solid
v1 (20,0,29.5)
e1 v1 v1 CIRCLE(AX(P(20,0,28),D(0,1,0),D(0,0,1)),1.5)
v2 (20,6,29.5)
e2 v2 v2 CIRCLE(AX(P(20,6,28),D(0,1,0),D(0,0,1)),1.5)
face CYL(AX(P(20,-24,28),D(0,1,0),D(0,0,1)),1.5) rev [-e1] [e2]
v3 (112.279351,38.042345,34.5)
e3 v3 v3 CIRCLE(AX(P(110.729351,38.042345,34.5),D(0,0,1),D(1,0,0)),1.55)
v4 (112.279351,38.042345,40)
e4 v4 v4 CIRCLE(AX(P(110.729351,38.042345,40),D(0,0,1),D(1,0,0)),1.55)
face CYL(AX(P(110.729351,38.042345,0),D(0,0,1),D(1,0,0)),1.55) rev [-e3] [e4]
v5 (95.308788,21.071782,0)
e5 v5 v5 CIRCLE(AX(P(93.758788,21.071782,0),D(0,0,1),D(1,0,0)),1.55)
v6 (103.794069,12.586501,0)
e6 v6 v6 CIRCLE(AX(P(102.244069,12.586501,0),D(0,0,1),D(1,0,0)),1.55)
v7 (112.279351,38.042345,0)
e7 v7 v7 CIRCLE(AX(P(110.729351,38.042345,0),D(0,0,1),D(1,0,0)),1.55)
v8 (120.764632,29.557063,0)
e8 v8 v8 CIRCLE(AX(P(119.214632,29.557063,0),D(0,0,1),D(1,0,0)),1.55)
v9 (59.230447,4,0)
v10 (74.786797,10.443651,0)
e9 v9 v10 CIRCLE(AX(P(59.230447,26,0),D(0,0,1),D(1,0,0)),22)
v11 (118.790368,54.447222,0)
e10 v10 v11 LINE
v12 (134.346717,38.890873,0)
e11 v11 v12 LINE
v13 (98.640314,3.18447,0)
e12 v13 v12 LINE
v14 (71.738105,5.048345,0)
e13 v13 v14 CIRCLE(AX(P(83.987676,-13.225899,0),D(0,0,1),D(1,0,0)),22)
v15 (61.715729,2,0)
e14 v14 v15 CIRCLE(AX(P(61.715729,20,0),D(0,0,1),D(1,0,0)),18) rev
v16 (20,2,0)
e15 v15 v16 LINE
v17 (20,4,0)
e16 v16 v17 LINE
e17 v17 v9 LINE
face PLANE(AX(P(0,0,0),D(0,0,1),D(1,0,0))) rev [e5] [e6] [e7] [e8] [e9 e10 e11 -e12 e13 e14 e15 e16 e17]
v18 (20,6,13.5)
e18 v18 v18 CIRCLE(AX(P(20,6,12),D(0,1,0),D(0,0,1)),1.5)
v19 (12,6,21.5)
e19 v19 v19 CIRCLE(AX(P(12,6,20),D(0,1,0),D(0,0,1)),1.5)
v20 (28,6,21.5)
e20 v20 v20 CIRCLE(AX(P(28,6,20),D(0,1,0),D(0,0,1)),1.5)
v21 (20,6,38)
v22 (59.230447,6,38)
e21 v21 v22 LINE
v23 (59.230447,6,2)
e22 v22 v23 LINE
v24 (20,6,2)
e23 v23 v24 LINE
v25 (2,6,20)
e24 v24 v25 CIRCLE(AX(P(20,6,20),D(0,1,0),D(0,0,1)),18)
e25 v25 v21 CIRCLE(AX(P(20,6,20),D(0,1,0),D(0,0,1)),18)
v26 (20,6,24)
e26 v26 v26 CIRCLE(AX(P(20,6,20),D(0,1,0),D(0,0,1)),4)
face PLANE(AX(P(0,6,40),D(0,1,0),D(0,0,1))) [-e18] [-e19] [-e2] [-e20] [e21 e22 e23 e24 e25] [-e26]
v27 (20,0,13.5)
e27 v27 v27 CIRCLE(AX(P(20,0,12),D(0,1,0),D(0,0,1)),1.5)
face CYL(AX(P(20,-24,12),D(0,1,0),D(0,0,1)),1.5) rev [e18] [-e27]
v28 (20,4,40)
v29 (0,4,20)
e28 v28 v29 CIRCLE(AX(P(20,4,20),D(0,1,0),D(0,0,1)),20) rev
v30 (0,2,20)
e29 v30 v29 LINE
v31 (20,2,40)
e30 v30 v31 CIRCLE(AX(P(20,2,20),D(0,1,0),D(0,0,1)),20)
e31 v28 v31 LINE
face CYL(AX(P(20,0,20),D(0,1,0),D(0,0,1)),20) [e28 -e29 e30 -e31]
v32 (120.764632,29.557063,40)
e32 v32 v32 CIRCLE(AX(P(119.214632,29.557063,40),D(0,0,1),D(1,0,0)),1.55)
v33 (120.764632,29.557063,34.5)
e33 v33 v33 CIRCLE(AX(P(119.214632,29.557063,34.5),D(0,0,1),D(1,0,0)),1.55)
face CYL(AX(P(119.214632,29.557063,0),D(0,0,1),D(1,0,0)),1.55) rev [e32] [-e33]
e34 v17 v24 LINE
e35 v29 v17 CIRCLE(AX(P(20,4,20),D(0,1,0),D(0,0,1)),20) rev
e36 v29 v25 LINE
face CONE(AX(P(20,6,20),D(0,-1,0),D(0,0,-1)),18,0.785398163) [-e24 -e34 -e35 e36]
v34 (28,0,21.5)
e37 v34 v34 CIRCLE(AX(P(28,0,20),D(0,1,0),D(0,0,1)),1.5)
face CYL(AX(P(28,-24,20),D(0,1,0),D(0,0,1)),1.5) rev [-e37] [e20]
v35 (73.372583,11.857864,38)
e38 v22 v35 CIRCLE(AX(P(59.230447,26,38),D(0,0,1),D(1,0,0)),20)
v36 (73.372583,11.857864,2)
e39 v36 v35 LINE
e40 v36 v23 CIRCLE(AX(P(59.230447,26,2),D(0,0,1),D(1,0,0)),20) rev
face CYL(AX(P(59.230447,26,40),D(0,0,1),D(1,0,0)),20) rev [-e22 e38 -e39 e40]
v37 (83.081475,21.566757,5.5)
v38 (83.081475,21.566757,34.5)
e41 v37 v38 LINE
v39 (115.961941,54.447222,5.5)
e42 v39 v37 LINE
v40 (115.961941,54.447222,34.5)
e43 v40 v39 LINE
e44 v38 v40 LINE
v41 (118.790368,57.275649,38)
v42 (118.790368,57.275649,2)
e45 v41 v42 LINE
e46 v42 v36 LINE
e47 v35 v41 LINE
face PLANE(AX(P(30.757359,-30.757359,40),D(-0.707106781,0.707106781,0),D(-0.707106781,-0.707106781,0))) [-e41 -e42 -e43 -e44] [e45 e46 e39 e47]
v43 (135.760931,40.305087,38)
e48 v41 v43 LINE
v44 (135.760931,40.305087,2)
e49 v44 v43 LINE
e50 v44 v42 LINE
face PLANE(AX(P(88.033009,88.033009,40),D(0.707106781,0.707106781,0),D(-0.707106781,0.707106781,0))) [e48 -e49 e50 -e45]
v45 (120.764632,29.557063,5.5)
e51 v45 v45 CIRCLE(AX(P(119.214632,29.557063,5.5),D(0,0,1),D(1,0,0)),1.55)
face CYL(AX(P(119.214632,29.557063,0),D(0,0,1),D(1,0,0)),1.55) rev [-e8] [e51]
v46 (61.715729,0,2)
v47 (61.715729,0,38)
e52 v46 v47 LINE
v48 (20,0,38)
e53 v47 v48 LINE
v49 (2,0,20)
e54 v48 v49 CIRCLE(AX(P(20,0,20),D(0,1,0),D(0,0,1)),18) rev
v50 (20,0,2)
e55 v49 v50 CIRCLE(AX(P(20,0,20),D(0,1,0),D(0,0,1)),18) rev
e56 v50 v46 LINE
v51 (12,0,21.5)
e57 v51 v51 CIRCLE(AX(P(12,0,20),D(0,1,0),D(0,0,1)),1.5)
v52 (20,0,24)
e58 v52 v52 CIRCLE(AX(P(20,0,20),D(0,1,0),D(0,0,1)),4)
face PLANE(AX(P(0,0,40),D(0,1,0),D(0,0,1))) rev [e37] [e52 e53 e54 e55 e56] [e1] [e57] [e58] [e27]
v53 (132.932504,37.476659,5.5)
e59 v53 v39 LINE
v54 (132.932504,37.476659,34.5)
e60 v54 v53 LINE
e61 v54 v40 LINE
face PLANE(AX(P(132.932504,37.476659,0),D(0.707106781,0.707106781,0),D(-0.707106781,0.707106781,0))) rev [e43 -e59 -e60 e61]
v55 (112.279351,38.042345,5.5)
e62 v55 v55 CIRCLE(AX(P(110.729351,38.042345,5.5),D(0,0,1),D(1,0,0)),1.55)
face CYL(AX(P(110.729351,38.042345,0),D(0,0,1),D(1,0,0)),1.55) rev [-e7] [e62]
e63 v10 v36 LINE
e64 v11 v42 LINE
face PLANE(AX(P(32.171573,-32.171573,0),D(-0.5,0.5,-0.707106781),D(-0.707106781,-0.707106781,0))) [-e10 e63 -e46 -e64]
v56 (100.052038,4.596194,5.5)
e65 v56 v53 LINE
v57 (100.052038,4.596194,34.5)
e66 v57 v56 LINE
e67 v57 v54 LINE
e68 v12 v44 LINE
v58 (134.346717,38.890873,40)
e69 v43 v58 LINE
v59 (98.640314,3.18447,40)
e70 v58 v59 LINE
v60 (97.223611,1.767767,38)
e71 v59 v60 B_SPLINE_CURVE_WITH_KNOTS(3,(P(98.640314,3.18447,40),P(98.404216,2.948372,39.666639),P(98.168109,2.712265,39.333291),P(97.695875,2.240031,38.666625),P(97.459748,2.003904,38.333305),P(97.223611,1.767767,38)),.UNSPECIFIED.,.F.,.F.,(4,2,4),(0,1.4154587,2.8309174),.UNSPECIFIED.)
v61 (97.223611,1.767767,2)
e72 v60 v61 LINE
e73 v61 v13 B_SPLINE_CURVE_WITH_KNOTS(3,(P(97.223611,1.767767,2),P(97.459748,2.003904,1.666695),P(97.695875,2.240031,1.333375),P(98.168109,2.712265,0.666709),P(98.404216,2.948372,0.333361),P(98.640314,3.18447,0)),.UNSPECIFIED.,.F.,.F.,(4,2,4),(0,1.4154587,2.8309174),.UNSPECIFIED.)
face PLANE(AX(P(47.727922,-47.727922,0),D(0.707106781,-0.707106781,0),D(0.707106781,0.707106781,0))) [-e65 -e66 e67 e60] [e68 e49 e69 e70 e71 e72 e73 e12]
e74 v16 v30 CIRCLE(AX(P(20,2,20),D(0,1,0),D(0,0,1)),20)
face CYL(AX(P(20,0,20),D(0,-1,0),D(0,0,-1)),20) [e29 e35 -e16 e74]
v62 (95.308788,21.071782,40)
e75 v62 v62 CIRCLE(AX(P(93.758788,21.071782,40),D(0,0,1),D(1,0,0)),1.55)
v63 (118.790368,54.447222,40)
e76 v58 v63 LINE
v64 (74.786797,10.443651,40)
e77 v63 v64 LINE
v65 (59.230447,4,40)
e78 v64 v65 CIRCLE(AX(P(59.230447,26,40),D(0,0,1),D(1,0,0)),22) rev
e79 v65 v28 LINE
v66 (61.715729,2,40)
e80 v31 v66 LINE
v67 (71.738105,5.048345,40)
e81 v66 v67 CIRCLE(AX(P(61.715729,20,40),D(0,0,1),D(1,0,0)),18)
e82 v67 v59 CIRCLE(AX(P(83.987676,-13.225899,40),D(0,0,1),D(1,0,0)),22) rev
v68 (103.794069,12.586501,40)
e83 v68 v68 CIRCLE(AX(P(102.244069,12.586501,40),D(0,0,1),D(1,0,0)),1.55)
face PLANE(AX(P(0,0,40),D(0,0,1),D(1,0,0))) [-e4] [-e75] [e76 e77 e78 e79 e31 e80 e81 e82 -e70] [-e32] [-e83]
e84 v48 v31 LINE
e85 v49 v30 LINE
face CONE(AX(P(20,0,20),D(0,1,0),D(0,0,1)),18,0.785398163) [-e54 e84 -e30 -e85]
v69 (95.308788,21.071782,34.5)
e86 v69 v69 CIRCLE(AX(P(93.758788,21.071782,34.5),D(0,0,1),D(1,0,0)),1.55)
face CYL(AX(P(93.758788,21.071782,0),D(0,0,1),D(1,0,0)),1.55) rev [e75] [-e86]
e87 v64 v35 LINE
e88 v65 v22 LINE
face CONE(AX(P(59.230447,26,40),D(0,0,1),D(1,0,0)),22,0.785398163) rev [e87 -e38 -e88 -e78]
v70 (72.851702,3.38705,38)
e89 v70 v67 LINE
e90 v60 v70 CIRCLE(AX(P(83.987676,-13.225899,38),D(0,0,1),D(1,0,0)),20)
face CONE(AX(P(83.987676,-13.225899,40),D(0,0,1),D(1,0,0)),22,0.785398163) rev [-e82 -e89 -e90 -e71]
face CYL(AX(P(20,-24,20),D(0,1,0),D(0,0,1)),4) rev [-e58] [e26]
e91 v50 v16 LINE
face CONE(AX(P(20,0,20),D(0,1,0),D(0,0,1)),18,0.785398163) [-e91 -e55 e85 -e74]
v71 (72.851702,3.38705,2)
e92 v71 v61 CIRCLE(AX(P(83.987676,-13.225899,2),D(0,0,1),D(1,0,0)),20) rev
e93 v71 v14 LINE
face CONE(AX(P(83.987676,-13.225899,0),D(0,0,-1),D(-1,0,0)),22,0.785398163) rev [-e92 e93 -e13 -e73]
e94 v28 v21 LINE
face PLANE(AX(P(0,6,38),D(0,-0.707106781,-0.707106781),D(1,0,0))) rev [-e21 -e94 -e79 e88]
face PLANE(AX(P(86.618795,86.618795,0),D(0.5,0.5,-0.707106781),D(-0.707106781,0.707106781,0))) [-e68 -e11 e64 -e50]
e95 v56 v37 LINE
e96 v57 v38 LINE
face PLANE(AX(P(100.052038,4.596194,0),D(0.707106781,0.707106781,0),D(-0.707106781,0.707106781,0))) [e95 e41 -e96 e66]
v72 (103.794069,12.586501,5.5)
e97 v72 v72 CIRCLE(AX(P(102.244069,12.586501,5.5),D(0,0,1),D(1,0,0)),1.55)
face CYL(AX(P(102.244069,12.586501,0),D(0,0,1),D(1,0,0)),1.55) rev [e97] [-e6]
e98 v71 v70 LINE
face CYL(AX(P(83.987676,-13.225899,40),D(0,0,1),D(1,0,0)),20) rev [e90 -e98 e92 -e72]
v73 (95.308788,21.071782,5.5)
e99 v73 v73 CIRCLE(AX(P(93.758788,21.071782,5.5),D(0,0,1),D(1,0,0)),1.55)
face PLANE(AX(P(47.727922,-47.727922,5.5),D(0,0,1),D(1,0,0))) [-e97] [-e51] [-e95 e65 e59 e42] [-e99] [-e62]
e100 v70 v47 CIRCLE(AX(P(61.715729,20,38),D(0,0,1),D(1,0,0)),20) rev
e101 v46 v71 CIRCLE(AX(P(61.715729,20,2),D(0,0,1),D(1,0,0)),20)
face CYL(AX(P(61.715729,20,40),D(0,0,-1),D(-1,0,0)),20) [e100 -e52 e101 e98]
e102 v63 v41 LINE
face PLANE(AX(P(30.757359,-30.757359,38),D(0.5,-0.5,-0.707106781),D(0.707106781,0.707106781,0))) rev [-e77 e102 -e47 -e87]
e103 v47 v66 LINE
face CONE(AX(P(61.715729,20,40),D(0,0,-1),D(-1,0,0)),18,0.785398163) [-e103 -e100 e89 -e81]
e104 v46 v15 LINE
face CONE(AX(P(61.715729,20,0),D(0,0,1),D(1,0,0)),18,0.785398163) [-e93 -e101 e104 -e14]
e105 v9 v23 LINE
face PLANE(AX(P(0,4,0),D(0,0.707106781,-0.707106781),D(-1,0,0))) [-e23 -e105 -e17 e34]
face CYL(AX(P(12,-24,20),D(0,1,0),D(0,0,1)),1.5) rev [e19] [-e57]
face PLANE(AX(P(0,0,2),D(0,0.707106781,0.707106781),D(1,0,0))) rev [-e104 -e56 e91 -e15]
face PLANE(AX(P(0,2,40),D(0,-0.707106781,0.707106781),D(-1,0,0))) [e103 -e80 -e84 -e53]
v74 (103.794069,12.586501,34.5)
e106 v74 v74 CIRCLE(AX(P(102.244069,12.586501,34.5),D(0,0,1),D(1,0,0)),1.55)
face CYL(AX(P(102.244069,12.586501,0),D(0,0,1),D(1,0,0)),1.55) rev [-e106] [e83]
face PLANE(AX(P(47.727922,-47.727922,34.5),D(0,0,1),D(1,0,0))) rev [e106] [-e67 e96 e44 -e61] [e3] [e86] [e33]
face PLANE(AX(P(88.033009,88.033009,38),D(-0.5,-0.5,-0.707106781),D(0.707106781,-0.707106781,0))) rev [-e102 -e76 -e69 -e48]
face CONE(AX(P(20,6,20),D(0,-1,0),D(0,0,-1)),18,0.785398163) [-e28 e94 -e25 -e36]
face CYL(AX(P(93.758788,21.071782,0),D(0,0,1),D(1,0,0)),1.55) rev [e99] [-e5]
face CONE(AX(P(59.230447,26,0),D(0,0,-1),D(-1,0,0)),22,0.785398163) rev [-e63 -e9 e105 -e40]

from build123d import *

# Parameters (mm, degrees)
BOSS_EXTRUDE1_DEPTH     = 40
SKETCH2_W               = 40
SKETCH2_H               = 54.5
SKETCH2_W_2             = 1.5
SKETCH2_H_2             = 46.5
BOSS_EXTRUDE2_DEPTH     = 18
SKETCH3_W               = 29
SKETCH3_H               = 46.5
CUT_EXTRUDE1_DEPTH      = 30
SKETCH4_R               = 4
SKETCH4_R_2             = 1.5
CUT_EXTRUDE2_DEPTH      = 30
CUT_EXTRUDE3_DEPTH      = 153.681139277
CUT_EXTRUDE3_DEPTH_BACK = 153.681139277
SKETCH8_R               = 1.55
SKETCH8_R_2             = 1.05
FILLET1_R               = 20
FILLET2_R               = 20
FILLET3_R               = 20
CHAMFER1_SIZE           = 2


# Some blends are built 0.0001 mm under size
with BuildPart() as part:
    # Sketch1 → Boss-Extrude1 (new body)
    with BuildSketch(Plane.XY):
        Polygon((118.790367902, 57.275649276), (67.514718626, 6), (0, 6), (0, 0), (70, 0), (123.033008589, 53.033008589), align=None)
    extrude(amount=BOSS_EXTRUDE1_DEPTH)

    # Sketch2 → Boss-Extrude2 (add)
    # profile 1 of 3: a face of its own
    with BuildSketch(Plane(origin=(35, -35, 0), x_dir=(0, 0, -1), z_dir=(0.7071067811865521, -0.707106781186543, 0))):
        with Locations((-20, 97.247474683)):
            Rectangle(SKETCH2_W, SKETCH2_H)
        Polygon((-36, 73.997474683), (-36, 120.497474683), (-34.5, 120.497474683), (-5.5, 120.497474683), (-4, 120.497474683), (-4, 73.997474683), (-5.5, 73.997474683), (-34.5, 73.997474683), align=None, mode=Mode.SUBTRACT)
    # profile 2 of 3: a face of its own
    with BuildSketch(Plane(origin=(35, -35, 0), x_dir=(0, 0, -1), z_dir=(0.7071067811865521, -0.707106781186543, 0))):
        with Locations((-35.25, 97.247474683)):
            Rectangle(SKETCH2_W_2, SKETCH2_H_2)
    # profile 3 of 3: a face of its own
    with BuildSketch(Plane(origin=(35, -35, 0), x_dir=(0, 0, -1), z_dir=(0.7071067811865521, -0.707106781186543, 0))):
        with Locations((-4.75, 97.247474683)):
            Rectangle(SKETCH2_W_2, SKETCH2_H_2)
    extrude(amount=BOSS_EXTRUDE2_DEPTH)

    # Sketch3 → Cut-Extrude1 (cut)
    with BuildSketch(Plane(origin=(35, -35, 0), x_dir=(0, 0, -1), z_dir=(0.7071067811865521, -0.707106781186543, 0))):
        with Locations((-20, 97.247474683)):
            Rectangle(SKETCH3_W, SKETCH3_H)
    extrude(amount=-CUT_EXTRUDE1_DEPTH, mode=Mode.SUBTRACT)

    # Sketch4 → Cut-Extrude2 (cut)
    with BuildSketch(Plane(origin=(0, 6, 0), x_dir=(1, 0, 0), z_dir=(0, 1, 0))):
        with Locations(Location((20, -20, 0), (0, 0, 270))):
            Circle(SKETCH4_R)
        with Locations(Location((20, -12, 0), (0, 0, 270))):
            Circle(SKETCH4_R_2)
        with Locations(Location((28, -20, 0), (0, 0, 270))):
            Circle(SKETCH4_R_2)
        with Locations(Location((20, -28, 0), (0, 0, 270))):
            Circle(SKETCH4_R_2)
        with Locations(Location((12, -20, 0), (0, 0, 270))):
            Circle(SKETCH4_R_2)
    extrude(amount=-CUT_EXTRUDE2_DEPTH, mode=Mode.SUBTRACT)

    # Sketch8 → Cut-Extrude3 (cut, two sides: drawn at the far end of the back side and taken through both)
    # profile 1 of 8: a face of its own
    with BuildSketch(Plane.XY.offset(40).offset(-CUT_EXTRUDE3_DEPTH_BACK)):
        with Locations((93.758787848, 21.071782079)):
            Circle(SKETCH8_R)
        with Locations((93.758787848, 21.071782079)):
            Circle(SKETCH8_R_2, mode=Mode.SUBTRACT)
    # profile 2 of 8: a face of its own
    with BuildSketch(Plane.XY.offset(40).offset(-CUT_EXTRUDE3_DEPTH_BACK)):
        with Locations((93.758787848, 21.071782079)):
            Circle(SKETCH8_R_2)
    # profile 3 of 8: a face of its own
    with BuildSketch(Plane.XY.offset(40).offset(-CUT_EXTRUDE3_DEPTH_BACK)):
        with Locations((102.244069222, 12.586500705)):
            Circle(SKETCH8_R)
        with Locations((102.244069222, 12.586500705)):
            Circle(SKETCH8_R_2, mode=Mode.SUBTRACT)
    # profile 4 of 8: a face of its own
    with BuildSketch(Plane.XY.offset(40).offset(-CUT_EXTRUDE3_DEPTH_BACK)):
        with Locations((102.244069222, 12.586500705)):
            Circle(SKETCH8_R_2)
    # profile 5 of 8: a face of its own
    with BuildSketch(Plane.XY.offset(40).offset(-CUT_EXTRUDE3_DEPTH_BACK)):
        with Locations((110.729350596, 38.042344828)):
            Circle(SKETCH8_R)
        with Locations((110.729350596, 38.042344828)):
            Circle(SKETCH8_R_2, mode=Mode.SUBTRACT)
    # profile 6 of 8: a face of its own
    with BuildSketch(Plane.XY.offset(40).offset(-CUT_EXTRUDE3_DEPTH_BACK)):
        with Locations((110.729350596, 38.042344828)):
            Circle(SKETCH8_R_2)
    # profile 7 of 8: a face of its own
    with BuildSketch(Plane.XY.offset(40).offset(-CUT_EXTRUDE3_DEPTH_BACK)):
        with Locations((119.214631971, 29.557063454)):
            Circle(SKETCH8_R)
        with Locations((119.214631971, 29.557063454)):
            Circle(SKETCH8_R_2, mode=Mode.SUBTRACT)
    # profile 8 of 8: a face of its own
    with BuildSketch(Plane.XY.offset(40).offset(-CUT_EXTRUDE3_DEPTH_BACK)):
        with Locations((119.214631971, 29.557063454)):
            Circle(SKETCH8_R_2)
    extrude(amount=CUT_EXTRUDE3_DEPTH + CUT_EXTRUDE3_DEPTH_BACK, mode=Mode.SUBTRACT)

    # Fillet1
    fillet1_edges = [part.edges().sort_by_distance(p)[0] for p in [
        (67.514718626, 6, 20),
        (70, 0, 20),
    ]]
    fillet(fillet1_edges, radius=FILLET1_R)

    # Fillet2
    # the kernel refuses this fillet: 20 mm, written as the material it adds along each edge
    with BuildSketch(Plane(origin=(84.495689014, 14.495689014, 40), x_dir=(0.7071067811865529, -0.7071067811865424, 0), z_dir=(0, 0, -1))) as fillet2_piece_1:
        with BuildLine():
            CenterArc((19.242903422, 19.961342417), FILLET2_R, 191.165307073, 75.271741026)
            Line((-0.378548289, 16.088535585), (-2.34069346, 15.701254901))
            ThreePointArc((-2.34069346, 15.701254901), (-2, 12.215728753), (-2, 0))
            Line((-2, 0), (0, -2))
            ThreePointArc((0, -2), (9, -2), (17.875709658, -1.996134242))
            Line((17.875709658, -1.996134242), (18, 0))
        make_face()
    extrude(amount=40)

    # Fillet3
    fillet3_edges = [part.edges().sort_by_distance(p)[0] for p in [
        (0, 3, 0),
        (0, 3, 40),
    ]]
    fillet(fillet3_edges, radius=FILLET3_R - 0.0001)  # a hair under: the kernel refuses the full size

    # Chamfer1
    chamfer1_edges = [part.edges().sort_by_distance(p)[0] for p in [
        (96.081475452, 34.566756826, 0),
        (96.081475452, 34.566756826, 40),
        (67.53556592, 0.865489414, 40),
        (66.884116026, 7.52240935, 0),
        (66.884116026, 7.52240935, 40),
        (67.53556592, 0.865489414, 0),
        (85.313564088, 6.73010305, 0),
        (127.275649276, 48.790367902, 40),
        (85.313564088, 6.73010305, 40),
        (40.857814376, 0, 0),
        (39.615173689, 6, 0),
        (39.615173689, 6, 40),
        (5.857835087, 6, 34.142164913),
        (5.857835087, 6, 5.857835087),
        (40.857814376, 0, 40),
        (5.857835087, 0, 34.142164913),
        (5.857835087, 0, 5.857835087),
        (127.275649276, 48.790367902, 0),
    ]]
    chamfer(chamfer1_edges, length=CHAMFER1_SIZE)


solid = part.part
